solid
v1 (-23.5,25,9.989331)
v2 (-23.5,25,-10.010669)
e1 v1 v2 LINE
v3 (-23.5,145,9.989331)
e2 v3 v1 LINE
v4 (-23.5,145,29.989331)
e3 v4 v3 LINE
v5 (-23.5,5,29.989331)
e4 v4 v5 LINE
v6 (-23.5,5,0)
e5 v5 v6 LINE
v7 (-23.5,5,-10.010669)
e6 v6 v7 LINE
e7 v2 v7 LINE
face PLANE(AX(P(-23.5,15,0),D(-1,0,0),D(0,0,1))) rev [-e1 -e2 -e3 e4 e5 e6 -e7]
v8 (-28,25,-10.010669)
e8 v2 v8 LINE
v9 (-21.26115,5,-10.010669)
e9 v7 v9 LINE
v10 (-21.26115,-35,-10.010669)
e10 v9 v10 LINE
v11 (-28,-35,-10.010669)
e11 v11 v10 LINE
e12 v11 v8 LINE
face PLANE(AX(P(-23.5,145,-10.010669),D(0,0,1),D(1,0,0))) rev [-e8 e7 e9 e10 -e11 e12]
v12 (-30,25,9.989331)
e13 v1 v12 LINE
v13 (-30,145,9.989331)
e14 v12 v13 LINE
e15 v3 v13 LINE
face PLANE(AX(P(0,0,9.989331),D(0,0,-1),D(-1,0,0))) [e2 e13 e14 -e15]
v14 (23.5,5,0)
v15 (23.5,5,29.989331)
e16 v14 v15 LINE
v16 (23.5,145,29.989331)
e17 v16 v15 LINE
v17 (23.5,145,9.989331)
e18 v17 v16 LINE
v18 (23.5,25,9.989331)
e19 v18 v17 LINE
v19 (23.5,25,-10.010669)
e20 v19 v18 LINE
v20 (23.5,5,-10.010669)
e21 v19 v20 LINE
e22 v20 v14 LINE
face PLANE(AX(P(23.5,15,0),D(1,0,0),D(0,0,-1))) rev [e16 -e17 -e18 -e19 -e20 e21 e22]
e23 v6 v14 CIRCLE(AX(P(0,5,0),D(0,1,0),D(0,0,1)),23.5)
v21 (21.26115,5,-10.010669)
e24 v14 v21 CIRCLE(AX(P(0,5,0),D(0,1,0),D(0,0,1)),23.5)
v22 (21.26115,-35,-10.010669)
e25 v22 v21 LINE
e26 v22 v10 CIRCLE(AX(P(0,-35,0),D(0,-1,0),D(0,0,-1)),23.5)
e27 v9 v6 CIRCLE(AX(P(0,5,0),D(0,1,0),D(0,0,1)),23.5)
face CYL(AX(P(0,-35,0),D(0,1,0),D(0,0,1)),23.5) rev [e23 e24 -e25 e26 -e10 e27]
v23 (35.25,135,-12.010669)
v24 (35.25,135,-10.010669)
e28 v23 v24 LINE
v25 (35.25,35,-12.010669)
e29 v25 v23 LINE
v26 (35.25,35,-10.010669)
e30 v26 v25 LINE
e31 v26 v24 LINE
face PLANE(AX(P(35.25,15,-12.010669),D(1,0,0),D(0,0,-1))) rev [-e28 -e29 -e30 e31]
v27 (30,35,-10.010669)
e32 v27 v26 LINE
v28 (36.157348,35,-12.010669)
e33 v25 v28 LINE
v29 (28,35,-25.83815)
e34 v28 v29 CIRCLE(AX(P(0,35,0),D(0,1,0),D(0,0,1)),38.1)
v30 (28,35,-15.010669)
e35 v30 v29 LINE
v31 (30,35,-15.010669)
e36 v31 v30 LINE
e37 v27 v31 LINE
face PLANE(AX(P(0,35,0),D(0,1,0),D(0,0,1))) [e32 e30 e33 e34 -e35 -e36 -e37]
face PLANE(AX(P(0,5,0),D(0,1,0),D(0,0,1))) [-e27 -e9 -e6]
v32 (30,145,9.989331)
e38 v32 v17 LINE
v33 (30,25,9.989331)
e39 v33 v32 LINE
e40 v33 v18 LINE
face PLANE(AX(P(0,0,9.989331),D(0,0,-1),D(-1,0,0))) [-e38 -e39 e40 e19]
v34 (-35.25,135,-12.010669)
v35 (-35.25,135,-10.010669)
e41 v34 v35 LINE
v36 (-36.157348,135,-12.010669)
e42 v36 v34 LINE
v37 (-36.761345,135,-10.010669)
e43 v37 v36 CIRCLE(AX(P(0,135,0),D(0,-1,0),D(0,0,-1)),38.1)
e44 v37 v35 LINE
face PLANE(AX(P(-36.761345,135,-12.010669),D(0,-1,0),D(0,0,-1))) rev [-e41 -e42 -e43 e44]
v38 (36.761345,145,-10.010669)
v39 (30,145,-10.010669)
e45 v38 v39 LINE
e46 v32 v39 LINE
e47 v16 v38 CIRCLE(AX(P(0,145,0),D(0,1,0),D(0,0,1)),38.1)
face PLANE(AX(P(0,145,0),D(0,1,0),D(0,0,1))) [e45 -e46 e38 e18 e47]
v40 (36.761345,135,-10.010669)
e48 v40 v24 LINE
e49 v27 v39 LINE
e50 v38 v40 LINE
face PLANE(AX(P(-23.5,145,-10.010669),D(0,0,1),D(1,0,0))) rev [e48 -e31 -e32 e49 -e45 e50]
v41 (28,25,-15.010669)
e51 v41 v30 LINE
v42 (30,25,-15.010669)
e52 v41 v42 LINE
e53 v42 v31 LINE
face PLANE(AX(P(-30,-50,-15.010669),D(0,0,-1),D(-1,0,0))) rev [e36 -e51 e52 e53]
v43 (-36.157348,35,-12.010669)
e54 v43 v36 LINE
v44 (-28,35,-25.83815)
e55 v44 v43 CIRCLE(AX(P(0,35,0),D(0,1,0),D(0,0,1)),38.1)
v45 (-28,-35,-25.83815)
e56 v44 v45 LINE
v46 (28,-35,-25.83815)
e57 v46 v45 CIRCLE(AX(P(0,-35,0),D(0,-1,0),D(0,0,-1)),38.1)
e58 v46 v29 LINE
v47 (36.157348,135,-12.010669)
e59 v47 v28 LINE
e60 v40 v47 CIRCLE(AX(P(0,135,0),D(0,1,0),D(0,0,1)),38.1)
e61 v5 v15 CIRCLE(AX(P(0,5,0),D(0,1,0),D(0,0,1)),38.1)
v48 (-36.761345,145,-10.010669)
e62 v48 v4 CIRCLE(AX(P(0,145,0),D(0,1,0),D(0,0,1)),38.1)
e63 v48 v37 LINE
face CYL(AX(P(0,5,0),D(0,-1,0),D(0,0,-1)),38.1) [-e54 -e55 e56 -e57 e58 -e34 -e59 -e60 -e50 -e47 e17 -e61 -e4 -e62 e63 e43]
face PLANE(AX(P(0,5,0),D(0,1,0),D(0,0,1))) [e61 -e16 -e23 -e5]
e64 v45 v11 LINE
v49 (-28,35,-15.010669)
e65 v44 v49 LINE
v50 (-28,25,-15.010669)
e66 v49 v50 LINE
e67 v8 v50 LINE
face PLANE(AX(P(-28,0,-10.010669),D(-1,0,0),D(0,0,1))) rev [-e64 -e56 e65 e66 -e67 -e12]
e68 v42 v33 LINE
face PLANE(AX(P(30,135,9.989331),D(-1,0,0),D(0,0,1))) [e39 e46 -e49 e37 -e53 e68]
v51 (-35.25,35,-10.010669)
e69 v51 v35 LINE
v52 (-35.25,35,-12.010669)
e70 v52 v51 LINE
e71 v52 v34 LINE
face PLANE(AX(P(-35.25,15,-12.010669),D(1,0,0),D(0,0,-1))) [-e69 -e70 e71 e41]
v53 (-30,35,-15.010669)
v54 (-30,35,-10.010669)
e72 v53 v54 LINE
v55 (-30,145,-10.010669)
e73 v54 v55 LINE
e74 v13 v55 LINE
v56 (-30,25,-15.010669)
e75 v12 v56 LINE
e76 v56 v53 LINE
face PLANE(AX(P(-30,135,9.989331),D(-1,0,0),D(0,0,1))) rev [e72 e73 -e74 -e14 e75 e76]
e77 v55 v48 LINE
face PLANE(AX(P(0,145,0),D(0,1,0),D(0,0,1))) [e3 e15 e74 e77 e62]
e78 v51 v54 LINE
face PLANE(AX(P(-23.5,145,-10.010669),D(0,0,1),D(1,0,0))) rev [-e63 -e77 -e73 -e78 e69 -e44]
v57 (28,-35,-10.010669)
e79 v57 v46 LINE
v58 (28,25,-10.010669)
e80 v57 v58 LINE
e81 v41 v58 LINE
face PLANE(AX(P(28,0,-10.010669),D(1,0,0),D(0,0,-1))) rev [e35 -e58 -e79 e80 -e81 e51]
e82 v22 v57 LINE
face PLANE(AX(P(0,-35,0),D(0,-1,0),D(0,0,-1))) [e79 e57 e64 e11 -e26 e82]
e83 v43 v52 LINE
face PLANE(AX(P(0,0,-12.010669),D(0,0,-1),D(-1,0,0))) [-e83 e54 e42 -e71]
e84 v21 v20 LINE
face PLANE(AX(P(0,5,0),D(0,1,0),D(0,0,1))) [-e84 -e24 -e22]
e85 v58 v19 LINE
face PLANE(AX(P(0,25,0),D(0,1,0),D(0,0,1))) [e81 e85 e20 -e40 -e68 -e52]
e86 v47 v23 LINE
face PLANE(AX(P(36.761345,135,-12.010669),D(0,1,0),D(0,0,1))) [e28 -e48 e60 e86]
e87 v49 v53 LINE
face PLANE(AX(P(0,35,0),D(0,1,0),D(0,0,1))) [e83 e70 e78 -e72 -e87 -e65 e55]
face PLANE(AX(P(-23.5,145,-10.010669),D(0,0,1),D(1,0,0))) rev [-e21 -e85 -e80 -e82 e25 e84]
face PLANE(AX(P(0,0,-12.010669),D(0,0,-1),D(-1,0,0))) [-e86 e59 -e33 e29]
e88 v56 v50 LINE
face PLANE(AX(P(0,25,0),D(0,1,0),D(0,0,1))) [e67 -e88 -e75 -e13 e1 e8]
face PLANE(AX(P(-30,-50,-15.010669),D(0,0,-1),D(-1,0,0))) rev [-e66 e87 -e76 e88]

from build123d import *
from build123d.topology import SkipClean

# Parameters (mm, degrees)
SKETCH1_R            = 38.1
BOSS_EXTRUDE5_DEPTH  = 5
BOSS_EXTRUDE6_DEPTH  = 10
BOSS_EXTRUDE7_DEPTH  = 130
SKETCH6_W            = 60
SKETCH6_H            = 10
CUT_EXTRUDE1_DEPTH   = 20
SKETCH7_W            = 1.51134539
SKETCH7_H            = 120
BOSS_EXTRUDE8_DEPTH  = 2
SKETCH8_OUTSIDE_W    = 114.332
SKETCH8_OUTSIDE_H    = 114.332
SKETCH8_OUTSIDE_R    = 38.1
CUT_EXTRUDE2_DEPTH   = 155.687491414
SKETCH10_W           = 70.5
SKETCH10_H           = 2
BOSS_EXTRUDE9_DEPTH  = 20
SKETCH11_W           = 56
SKETCH11_H           = 30
CUT_EXTRUDE3_DEPTH   = 123.487632029
BOSS_EXTRUDE10_START = 35
BOSS_EXTRUDE10_DEPTH = 35
SKETCH13_R           = 23.5
CUT_EXTRUDE4_DEPTH   = 151.010732949
BOSS_EXTRUDE11_DEPTH = 20
SKETCH16_W           = 60
SKETCH16_H           = 25
CUT_EXTRUDE5_DEPTH   = 110


with BuildPart() as part:
    # Sketch1 → Boss-Extrude5 (new body)
    with BuildSketch(Plane(origin=(0, 0, 0), x_dir=(1, 0, 0), z_dir=(0, 1, 0))):
        with Locations(Location((0, 0, 0), (0, 0, 270))):
            Circle(SKETCH1_R)
    extrude(amount=BOSS_EXTRUDE5_DEPTH)

    # Sketch4 → Boss-Extrude6 (add)
    with BuildSketch(Plane(origin=(0, 5, 0), x_dir=(1, 0, 0), z_dir=(0, 1, 0))):
        with BuildLine():
            ThreePointArc((38.1, 0), (-16.677229986, 34.256094348), (-23.5, -29.989331436))
            Line((-23.5, -29.989331436), (-23.5, 10.010668564))
            Line((-23.5, 10.010668564), (23.5, 10.010668564))
            Line((23.5, 10.010668564), (23.5, -29.989331436))
            ThreePointArc((23.5, -29.989331436), (34.256094348, -16.677229986), (38.1, 0))
        make_face()
    extrude(amount=BOSS_EXTRUDE6_DEPTH)

    # Sketch5 → Boss-Extrude7 (add)
    with SkipClean():  # the faces are left unmerged after this step: merging them gives an invalid solid
        with BuildSketch(Plane(origin=(0, 15, 0), x_dir=(1, 0, 0), z_dir=(0, 1, 0))):
            with BuildLine():
                Line((-23.5, 10.010668564), (-36.76134539, 10.010668564))
                ThreePointArc((-36.76134539, 10.010668564), (-36.164311649, -11.98968569), (-23.5, -29.989331436))
                Line((-23.5, -29.989331436), (-23.5, 10.010668564))
            make_face()
            with BuildLine():
                Line((23.5, 10.010668564), (36.76134539, 10.010668564))
                ThreePointArc((36.76134539, 10.010668564), (36.164311649, -11.98968569), (23.5, -29.989331436))
                Line((23.5, -29.989331436), (23.5, 10.010668564))
            make_face()
        extrude(amount=BOSS_EXTRUDE7_DEPTH)

    # Sketch6 → Cut-Extrude1 (cut)
    with SkipClean():  # the faces are left unmerged after this step: merging them gives an invalid solid
        with BuildSketch(Plane(origin=(0, 0, -10.010668564), x_dir=(-1, 0, 0), z_dir=(0, 0, -1))):
            with Locations((0, 140)):
                Rectangle(SKETCH6_W, SKETCH6_H)
        extrude(amount=-CUT_EXTRUDE1_DEPTH, mode=Mode.SUBTRACT)

    # Sketch7 → Boss-Extrude8 (add)
    with SkipClean():  # the faces are left unmerged after this step: merging them gives an invalid solid
        with BuildSketch(Plane(origin=(0, 0, -10.010668564), x_dir=(-1, 0, 0), z_dir=(0, 0, -1))):
            with Locations((36.005672695, 75)):
                Rectangle(SKETCH7_W, SKETCH7_H)
            with Locations((-36.005672695, 75)):
                Rectangle(SKETCH7_W, SKETCH7_H)
        extrude(amount=BOSS_EXTRUDE8_DEPTH)

    # Sketch8 outside → Cut-Extrude2 (cut, through all)
    with SkipClean():  # the faces are left unmerged after this step: merging them gives an invalid solid
        with BuildSketch(Plane.XZ):
            Rectangle(SKETCH8_OUTSIDE_W, SKETCH8_OUTSIDE_H)
            with Locations(Location((0, 0, 0), (0, 0, 341.624658097))):
                Circle(SKETCH8_OUTSIDE_R, mode=Mode.SUBTRACT)
        extrude(amount=-CUT_EXTRUDE2_DEPTH, mode=Mode.SUBTRACT)
    add(part.part.scale(1), mode=Mode.REPLACE)  # the faces are merged on a copy

    # Sketch10 → Boss-Extrude9 (add)
    with SkipClean():  # the faces are left unmerged after this step: merging them gives an invalid solid
        with BuildSketch(Plane(origin=(0, 15, 0), x_dir=(1, 0, 0), z_dir=(0, 1, 0))):
            with Locations((0, 11.010668564)):
                Rectangle(SKETCH10_W, SKETCH10_H)
        extrude(amount=BOSS_EXTRUDE9_DEPTH)

    # Sketch11 → Cut-Extrude3 (cut, through all)
    with SkipClean():  # the faces are left unmerged after this step: merging them gives an invalid solid
        with BuildSketch(Plane(origin=(0, 35, 0), x_dir=(1, 0, 0), z_dir=(0, 1, 0))):
            with Locations((0, 25.010668564)):
                Rectangle(SKETCH11_W, SKETCH11_H)
        extrude(amount=-CUT_EXTRUDE3_DEPTH, mode=Mode.SUBTRACT)

    # Sketch12 → Boss-Extrude10 (add)
    with SkipClean():  # the faces are left unmerged after this step: merging them gives an invalid solid
        with BuildSketch(Plane.XZ.offset(BOSS_EXTRUDE10_START)):
            with BuildLine():
                Line((-28, -25.838150089), (-28, -10.010668564))
                Line((-28, -10.010668564), (28, -10.010668564))
                Line((28, -10.010668564), (28, -25.838150089))
                ThreePointArc((28, -25.838150089), (0, 38.1), (-28, -25.838150089))
            make_face()
        extrude(amount=-BOSS_EXTRUDE10_DEPTH)

    # Sketch13 → Cut-Extrude4 (cut, through all)
    with SkipClean():  # the faces are left unmerged after this step: merging them gives an invalid solid
        with BuildSketch(Plane(origin=(0, 5, 0), x_dir=(1, 0, 0), z_dir=(0, 1, 0))):
            Circle(SKETCH13_R)
        extrude(amount=-CUT_EXTRUDE4_DEPTH, mode=Mode.SUBTRACT)

    # Sketch14 → Boss-Extrude11 (add)
    with SkipClean():  # the faces are left unmerged after this step: merging them gives an invalid solid
        with BuildSketch(Plane(origin=(0, 15, 0), x_dir=(1, 0, 0), z_dir=(0, 1, 0))):
            with BuildLine():
                Line((28, 25.838150089), (28, 12.010668564))
                Line((28, 12.010668564), (36.157348363, 12.010668564))
                ThreePointArc((36.157348363, 12.010668564), (32.815257862, 19.35894758), (28, 25.838150089))
            make_face()
            with BuildLine():
                Line((-28, 12.010668564), (-28, 25.838150089))
                ThreePointArc((-28, 25.838150089), (-32.815257862, 19.35894758), (-36.157348363, 12.010668564))
                Line((-36.157348363, 12.010668564), (-28, 12.010668564))
            make_face()
        extrude(amount=BOSS_EXTRUDE11_DEPTH)

    # Sketch16 → Cut-Extrude5 (cut)
    with SkipClean():  # the faces are left unmerged after this step: merging them gives an invalid solid
        with BuildSketch(Plane(origin=(0, 135, 0), x_dir=(1, 0, 0), z_dir=(0, 1, 0))):
            with Locations((0, 2.510668564)):
                Rectangle(SKETCH16_W, SKETCH16_H)
        extrude(amount=-CUT_EXTRUDE5_DEPTH, mode=Mode.SUBTRACT)


solid = part.part
